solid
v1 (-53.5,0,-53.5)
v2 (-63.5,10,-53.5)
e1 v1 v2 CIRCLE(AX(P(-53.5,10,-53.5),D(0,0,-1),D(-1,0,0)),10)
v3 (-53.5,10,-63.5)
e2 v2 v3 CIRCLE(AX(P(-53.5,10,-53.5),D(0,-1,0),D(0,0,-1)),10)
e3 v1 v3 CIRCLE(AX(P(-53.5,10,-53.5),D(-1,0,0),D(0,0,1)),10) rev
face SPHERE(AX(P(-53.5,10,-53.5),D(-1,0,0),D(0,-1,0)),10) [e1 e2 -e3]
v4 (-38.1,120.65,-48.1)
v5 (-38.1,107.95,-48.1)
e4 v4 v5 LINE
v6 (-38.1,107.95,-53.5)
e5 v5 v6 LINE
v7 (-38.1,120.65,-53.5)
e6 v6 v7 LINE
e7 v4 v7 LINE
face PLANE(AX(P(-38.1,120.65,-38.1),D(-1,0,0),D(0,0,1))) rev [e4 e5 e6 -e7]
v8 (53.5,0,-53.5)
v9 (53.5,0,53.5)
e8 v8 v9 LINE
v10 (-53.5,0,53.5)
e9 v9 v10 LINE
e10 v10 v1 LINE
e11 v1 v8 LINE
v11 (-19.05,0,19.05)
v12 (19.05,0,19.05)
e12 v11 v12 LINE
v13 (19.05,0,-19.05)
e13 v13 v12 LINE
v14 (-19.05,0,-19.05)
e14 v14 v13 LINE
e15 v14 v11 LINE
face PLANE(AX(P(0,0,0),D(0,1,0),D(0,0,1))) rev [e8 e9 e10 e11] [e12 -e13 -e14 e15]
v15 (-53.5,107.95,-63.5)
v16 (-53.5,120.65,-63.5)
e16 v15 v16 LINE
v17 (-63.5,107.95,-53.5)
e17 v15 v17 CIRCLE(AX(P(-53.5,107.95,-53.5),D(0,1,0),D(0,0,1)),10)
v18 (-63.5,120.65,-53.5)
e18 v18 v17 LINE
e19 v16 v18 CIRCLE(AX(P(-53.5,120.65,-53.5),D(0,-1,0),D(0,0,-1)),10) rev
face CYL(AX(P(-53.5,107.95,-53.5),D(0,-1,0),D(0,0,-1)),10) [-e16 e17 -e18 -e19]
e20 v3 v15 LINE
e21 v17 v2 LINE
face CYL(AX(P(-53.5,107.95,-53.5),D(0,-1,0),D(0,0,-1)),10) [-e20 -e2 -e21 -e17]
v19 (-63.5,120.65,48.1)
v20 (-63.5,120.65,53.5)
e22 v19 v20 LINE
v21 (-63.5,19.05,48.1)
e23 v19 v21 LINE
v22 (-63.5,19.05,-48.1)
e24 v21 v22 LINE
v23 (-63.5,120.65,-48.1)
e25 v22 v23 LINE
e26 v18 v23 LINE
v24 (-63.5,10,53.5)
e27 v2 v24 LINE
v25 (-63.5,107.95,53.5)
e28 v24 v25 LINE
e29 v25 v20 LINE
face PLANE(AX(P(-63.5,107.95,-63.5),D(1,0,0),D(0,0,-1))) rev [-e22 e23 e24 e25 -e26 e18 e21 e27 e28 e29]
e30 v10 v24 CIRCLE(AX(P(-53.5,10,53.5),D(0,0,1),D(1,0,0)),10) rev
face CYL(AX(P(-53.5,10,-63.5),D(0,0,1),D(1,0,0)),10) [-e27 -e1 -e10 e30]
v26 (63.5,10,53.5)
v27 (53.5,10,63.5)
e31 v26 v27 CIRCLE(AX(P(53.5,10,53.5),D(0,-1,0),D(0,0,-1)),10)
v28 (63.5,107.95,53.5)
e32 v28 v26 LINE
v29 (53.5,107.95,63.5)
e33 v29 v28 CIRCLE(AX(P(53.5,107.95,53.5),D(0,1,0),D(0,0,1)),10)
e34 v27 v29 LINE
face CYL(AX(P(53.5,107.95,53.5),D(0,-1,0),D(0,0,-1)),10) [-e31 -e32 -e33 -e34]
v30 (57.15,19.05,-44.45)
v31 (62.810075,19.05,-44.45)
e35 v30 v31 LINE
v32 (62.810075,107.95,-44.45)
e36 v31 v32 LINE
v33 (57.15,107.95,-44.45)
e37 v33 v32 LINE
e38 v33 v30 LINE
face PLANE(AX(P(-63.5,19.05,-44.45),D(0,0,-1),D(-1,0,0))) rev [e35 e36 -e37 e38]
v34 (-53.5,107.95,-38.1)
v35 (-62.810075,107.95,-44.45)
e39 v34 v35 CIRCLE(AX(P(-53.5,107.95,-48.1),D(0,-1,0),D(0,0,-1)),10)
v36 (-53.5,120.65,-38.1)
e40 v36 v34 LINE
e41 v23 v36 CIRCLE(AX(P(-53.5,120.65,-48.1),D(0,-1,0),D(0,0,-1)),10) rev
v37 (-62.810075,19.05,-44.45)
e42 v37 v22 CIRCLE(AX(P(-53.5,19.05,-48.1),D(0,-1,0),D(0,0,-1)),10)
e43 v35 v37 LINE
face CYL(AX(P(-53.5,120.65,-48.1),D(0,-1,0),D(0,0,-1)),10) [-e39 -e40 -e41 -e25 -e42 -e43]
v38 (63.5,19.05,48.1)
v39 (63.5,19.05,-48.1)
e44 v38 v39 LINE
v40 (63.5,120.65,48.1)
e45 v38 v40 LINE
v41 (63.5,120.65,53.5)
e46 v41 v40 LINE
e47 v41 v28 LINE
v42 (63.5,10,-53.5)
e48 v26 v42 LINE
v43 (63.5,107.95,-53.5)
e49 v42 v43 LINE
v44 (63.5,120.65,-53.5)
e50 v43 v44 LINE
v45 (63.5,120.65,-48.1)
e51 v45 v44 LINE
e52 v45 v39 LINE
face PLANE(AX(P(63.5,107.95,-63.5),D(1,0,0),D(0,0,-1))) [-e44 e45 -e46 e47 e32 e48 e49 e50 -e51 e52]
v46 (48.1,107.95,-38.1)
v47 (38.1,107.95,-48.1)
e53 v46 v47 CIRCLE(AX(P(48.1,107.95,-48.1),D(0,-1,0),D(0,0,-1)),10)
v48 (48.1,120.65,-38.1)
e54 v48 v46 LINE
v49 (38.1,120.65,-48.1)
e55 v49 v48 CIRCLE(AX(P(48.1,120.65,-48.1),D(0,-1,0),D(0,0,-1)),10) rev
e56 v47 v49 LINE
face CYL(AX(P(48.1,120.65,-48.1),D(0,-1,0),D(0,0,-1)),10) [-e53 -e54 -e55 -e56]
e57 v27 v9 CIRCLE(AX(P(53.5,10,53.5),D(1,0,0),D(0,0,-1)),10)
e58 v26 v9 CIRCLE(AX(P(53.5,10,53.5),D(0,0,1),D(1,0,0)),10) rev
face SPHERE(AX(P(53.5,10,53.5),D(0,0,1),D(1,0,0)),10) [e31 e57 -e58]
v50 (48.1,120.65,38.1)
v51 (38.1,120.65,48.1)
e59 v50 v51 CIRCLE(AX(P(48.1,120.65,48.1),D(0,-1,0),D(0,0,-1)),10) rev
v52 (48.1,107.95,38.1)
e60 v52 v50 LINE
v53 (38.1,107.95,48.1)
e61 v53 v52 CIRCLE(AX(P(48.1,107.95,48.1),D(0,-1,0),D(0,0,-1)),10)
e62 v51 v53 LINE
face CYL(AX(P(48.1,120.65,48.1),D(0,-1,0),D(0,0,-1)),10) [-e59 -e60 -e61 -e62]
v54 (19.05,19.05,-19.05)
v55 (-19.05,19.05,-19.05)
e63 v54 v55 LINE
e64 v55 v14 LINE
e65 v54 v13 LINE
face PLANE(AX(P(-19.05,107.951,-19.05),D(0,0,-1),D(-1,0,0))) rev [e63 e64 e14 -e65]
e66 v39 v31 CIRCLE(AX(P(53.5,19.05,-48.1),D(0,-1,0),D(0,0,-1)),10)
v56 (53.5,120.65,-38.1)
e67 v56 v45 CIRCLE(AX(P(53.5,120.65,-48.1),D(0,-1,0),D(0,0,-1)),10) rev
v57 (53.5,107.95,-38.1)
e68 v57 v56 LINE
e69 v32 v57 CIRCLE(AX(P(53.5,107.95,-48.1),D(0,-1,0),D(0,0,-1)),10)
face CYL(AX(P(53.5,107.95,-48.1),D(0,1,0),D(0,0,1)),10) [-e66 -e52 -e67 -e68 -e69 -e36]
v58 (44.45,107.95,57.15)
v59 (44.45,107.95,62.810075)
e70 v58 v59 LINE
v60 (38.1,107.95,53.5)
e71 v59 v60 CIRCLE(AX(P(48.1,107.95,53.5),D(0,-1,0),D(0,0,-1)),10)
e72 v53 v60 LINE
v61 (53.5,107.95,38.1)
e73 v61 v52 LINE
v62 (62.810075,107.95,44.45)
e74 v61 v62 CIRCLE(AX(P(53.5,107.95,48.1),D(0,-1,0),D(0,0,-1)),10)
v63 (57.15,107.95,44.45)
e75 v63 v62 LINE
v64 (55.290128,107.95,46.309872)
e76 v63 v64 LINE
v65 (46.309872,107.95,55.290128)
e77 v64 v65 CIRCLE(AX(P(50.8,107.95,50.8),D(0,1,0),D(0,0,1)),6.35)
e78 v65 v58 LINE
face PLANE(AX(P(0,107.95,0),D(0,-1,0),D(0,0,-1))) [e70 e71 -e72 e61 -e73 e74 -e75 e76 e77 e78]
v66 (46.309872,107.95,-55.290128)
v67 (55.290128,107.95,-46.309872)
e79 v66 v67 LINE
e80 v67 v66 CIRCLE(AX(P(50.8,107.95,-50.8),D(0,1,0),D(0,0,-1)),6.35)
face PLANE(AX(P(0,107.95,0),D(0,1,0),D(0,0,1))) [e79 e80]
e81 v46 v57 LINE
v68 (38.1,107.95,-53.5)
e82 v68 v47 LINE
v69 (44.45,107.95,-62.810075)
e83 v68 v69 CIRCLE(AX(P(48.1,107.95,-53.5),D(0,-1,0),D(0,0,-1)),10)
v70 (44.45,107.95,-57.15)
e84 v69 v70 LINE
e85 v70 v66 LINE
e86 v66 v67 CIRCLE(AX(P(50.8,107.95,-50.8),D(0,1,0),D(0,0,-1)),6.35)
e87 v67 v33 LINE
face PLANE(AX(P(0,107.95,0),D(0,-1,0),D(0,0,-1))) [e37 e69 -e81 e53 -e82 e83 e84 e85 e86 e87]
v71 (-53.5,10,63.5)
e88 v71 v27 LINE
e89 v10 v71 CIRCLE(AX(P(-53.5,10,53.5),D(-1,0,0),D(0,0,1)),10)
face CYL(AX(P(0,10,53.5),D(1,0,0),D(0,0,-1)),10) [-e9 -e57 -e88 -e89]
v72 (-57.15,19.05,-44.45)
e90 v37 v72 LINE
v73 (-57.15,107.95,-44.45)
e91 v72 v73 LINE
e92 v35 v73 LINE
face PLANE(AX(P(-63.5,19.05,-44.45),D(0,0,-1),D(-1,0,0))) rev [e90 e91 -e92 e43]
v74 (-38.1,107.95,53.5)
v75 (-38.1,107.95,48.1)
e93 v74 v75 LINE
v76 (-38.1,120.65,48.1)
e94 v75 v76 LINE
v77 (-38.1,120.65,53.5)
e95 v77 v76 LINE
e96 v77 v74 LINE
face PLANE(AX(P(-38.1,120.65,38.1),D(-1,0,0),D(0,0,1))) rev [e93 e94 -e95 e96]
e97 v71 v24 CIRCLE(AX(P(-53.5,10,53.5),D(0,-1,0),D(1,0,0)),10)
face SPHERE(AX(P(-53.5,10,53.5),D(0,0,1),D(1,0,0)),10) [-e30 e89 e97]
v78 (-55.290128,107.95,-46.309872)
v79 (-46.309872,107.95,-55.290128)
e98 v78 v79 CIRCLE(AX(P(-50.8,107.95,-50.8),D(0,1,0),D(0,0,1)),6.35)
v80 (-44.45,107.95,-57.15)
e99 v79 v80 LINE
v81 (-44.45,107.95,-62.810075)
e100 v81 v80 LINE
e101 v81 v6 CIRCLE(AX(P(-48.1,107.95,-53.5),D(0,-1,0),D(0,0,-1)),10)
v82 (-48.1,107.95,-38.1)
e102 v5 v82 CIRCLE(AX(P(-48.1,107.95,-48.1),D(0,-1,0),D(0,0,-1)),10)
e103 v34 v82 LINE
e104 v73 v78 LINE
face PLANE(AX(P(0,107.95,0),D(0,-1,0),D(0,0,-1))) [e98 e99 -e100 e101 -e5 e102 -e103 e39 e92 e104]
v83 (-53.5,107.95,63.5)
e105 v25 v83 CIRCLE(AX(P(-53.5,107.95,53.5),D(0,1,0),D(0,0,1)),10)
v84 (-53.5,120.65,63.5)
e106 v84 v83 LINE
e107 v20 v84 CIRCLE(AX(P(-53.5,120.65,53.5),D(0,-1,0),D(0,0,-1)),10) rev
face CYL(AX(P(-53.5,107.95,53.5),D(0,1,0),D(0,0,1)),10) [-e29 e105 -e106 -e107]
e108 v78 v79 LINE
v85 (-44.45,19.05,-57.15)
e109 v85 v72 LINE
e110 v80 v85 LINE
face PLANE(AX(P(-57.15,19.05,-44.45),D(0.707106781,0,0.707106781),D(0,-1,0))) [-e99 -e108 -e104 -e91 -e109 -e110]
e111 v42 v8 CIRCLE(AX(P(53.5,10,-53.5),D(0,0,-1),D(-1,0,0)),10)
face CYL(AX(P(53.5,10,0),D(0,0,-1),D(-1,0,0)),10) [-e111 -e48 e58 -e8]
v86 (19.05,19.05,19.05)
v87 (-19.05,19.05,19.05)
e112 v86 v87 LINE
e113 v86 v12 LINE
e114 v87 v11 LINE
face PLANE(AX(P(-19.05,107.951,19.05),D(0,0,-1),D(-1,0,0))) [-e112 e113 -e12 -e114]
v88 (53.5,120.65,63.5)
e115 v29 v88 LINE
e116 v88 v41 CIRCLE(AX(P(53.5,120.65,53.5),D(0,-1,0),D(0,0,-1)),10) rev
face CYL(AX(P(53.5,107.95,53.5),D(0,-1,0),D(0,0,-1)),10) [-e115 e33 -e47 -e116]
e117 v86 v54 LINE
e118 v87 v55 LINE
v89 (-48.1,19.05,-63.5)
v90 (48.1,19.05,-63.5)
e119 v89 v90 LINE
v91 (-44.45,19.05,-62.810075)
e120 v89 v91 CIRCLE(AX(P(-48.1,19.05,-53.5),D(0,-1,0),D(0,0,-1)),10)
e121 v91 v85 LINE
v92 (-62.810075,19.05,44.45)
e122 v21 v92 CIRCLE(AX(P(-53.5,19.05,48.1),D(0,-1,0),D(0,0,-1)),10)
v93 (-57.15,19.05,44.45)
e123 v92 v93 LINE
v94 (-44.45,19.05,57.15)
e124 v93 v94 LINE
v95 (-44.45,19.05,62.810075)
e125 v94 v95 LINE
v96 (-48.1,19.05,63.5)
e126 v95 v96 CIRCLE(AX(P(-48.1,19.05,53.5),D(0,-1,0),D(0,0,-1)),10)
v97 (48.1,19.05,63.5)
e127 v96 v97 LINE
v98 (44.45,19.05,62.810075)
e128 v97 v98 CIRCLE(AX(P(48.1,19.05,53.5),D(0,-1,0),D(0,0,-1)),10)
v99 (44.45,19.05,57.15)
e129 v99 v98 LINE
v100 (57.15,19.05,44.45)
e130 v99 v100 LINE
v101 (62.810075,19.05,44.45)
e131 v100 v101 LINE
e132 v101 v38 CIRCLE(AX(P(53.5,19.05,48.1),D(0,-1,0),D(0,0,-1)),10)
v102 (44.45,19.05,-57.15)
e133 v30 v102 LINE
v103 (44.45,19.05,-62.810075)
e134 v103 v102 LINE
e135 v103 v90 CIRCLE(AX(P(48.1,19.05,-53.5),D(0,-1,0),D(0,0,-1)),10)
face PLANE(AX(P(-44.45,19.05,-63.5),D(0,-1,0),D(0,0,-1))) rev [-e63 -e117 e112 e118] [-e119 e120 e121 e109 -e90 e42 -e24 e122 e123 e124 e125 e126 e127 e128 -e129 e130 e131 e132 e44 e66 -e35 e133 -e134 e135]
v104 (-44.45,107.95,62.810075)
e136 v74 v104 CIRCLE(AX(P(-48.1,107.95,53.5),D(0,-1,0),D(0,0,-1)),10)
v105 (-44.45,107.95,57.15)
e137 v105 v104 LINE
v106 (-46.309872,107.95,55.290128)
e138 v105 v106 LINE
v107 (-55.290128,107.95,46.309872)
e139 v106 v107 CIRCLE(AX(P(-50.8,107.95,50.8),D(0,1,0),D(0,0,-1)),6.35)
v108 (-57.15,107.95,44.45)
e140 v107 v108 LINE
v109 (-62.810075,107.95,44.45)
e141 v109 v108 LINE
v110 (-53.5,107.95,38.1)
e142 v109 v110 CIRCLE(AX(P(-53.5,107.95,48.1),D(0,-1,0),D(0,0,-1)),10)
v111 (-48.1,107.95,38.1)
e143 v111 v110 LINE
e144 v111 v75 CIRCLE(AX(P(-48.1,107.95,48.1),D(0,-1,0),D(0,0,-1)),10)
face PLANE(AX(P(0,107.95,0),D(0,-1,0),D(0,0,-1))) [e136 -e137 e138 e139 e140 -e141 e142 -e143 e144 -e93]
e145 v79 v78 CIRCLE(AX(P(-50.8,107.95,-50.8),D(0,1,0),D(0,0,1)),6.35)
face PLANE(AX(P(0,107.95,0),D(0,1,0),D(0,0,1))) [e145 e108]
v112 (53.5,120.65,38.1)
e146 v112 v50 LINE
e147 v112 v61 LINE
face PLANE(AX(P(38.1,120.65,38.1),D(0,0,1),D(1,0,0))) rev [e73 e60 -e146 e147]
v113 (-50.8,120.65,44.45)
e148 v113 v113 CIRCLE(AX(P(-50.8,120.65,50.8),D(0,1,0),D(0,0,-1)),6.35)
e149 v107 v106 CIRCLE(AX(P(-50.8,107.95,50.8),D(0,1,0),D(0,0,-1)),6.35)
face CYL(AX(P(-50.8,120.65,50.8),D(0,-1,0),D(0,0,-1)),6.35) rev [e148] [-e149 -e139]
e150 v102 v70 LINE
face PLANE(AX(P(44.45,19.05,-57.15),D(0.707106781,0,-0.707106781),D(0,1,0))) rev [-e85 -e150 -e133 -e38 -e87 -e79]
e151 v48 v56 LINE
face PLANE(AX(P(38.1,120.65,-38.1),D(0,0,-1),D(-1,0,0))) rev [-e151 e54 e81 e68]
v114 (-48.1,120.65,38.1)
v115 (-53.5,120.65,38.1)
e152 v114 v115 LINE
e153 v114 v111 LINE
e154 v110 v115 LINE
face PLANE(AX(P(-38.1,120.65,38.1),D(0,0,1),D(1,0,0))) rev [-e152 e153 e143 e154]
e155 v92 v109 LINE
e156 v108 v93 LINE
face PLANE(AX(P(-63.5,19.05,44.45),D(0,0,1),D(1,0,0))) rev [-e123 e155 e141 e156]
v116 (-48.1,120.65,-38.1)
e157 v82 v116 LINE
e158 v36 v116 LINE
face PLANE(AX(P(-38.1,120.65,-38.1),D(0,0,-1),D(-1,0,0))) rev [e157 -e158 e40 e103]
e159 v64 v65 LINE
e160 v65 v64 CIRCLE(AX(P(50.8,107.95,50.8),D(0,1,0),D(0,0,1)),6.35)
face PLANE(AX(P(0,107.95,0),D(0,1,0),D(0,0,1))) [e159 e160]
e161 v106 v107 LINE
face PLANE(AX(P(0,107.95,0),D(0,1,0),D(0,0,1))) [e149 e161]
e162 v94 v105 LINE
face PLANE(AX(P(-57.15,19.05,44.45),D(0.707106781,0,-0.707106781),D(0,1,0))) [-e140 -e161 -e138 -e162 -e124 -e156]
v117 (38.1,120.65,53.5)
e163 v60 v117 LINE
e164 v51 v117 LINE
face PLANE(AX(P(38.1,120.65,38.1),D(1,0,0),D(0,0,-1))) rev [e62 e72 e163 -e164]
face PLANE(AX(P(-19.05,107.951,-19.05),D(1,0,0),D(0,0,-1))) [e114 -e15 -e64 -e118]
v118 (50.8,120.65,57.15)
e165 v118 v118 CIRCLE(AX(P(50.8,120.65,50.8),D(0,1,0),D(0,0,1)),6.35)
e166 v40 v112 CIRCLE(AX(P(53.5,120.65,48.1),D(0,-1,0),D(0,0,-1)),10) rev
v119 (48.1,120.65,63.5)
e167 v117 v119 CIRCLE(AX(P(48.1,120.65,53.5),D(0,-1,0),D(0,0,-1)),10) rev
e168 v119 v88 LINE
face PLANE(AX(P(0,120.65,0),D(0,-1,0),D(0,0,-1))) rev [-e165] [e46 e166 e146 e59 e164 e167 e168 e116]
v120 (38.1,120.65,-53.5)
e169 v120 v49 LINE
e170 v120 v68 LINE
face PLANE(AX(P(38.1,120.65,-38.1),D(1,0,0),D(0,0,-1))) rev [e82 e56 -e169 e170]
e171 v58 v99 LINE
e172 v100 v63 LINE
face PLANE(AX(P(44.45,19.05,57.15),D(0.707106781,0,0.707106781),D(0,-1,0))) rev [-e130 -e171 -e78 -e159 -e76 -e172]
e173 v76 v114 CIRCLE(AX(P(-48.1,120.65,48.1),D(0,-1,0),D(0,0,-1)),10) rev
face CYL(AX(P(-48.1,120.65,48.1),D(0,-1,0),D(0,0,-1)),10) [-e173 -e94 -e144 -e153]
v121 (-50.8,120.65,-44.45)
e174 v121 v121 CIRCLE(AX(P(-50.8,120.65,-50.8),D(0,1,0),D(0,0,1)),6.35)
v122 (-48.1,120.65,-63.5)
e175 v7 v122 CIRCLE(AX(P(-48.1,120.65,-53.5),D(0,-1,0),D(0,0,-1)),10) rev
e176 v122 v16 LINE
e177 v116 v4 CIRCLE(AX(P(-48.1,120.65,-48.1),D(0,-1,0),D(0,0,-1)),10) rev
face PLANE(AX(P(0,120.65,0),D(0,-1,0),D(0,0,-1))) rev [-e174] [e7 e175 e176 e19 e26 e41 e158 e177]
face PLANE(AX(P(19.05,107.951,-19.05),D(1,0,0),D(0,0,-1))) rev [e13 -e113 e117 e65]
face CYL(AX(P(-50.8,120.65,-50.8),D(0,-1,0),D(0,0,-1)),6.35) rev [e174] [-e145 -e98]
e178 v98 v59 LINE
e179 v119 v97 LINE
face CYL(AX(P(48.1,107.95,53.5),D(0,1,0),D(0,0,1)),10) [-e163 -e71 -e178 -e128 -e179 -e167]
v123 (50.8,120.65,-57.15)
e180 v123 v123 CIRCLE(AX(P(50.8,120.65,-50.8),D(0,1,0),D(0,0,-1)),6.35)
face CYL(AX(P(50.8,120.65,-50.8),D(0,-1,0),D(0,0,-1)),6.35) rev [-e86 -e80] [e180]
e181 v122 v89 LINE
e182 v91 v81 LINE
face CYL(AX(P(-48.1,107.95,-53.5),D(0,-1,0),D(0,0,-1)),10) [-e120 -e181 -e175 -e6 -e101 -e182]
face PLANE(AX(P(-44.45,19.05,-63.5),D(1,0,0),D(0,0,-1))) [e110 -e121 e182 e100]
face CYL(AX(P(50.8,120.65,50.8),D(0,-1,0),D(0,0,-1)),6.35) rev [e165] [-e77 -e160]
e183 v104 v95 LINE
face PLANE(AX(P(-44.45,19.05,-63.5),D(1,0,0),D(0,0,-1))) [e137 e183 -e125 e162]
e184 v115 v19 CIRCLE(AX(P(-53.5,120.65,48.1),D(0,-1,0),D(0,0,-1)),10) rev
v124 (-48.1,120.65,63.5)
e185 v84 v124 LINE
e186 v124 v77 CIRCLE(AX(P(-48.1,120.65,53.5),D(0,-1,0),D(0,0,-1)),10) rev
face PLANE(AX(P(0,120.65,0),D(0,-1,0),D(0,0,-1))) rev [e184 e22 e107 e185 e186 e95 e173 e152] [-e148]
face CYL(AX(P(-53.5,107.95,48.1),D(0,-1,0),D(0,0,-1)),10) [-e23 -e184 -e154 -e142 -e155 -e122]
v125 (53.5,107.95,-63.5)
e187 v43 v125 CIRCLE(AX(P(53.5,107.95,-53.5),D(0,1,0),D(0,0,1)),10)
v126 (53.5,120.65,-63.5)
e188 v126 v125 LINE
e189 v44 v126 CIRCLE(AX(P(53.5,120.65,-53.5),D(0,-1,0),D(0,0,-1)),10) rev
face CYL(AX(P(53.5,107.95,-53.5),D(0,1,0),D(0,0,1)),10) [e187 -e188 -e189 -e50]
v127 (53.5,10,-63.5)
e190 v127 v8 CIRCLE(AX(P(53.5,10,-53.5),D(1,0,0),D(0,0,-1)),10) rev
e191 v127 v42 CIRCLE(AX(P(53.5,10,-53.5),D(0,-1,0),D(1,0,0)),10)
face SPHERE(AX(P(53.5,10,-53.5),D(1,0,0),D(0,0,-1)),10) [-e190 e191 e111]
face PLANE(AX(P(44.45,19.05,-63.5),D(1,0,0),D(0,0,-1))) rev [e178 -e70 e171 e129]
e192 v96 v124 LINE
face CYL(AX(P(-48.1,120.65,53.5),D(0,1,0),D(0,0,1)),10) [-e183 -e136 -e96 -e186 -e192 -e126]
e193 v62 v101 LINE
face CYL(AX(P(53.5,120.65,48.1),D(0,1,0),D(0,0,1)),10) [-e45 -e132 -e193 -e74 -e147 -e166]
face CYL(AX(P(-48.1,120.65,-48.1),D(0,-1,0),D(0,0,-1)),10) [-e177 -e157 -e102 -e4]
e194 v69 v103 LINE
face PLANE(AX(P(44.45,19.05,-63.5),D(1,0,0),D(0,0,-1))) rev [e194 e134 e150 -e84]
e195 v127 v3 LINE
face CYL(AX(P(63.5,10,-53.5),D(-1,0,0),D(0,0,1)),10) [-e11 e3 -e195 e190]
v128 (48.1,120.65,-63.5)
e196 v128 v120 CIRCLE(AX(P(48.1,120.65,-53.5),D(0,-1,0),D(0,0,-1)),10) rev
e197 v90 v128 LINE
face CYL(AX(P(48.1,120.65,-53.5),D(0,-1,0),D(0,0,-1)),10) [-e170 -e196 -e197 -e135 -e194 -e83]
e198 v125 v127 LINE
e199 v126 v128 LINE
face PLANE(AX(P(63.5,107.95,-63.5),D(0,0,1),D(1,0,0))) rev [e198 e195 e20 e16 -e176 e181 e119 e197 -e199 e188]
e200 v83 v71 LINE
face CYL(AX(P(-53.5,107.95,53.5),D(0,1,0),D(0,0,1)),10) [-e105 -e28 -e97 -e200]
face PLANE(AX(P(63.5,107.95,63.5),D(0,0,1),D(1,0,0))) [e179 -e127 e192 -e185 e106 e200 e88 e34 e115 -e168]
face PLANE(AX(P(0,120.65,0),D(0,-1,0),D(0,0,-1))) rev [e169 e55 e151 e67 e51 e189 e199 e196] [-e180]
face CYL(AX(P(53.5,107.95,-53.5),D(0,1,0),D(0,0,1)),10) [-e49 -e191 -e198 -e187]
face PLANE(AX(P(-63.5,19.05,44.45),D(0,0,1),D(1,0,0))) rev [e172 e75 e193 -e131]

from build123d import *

# Parameters (mm, degrees)
SKETCH1_W           = 127
SKETCH1_H           = 127
BOSS_EXTRUDE1_DEPTH = 107.95
SKETCH2_W           = 88.9
SKETCH2_H           = 88.9
CUT_EXTRUDE1_DEPTH  = 179.366063196
SKETCH4_W           = 88.9
SKETCH4_H           = 88.9
CUT_EXTRUDE4_DEPTH  = 179.366063196
CUT_EXTRUDE5_REACH  = 142.42
SKETCH6_W           = 38.1
SKETCH6_H           = 38.1
FILLET1_R           = 10
CHAMFER2_SIZE       = 12.7
SKETCH7_W           = 25.4
SKETCH7_H           = 25.4
SKETCH7_R           = 6.35
BOSS_EXTRUDE2_DEPTH = 12.7
FILLET2_START       = 19.05
FILLET2_DEPTH       = 101.6


with BuildPart() as part:
    # Sketch1 → Boss-Extrude1 (new body)
    with BuildSketch(Plane(origin=(0, 0, 0), x_dir=(1, 0, 0), z_dir=(0, 1, 0))):
        Rectangle(SKETCH1_W, SKETCH1_H)
    extrude(amount=BOSS_EXTRUDE1_DEPTH)

    # Sketch2 → Cut-Extrude1 (cut, through all)
    with BuildSketch(Plane.XY.offset(63.5)):
        with Locations((0, 63.5)):
            Rectangle(SKETCH2_W, SKETCH2_H)
    extrude(amount=-CUT_EXTRUDE1_DEPTH, mode=Mode.SUBTRACT)

    # Sketch4 → Cut-Extrude4 (cut, through all)
    with BuildSketch(Plane(origin=(63.5, 0, 0), x_dir=(0, 0, -1), z_dir=(1, 0, 0))):
        with Locations((0, 63.5)):
            Rectangle(SKETCH4_W, SKETCH4_H)
    extrude(amount=-CUT_EXTRUDE4_DEPTH, mode=Mode.SUBTRACT)

    # Sketch6 → Cut-Extrude5 (cut, up to next)
    with BuildSketch(Plane.XZ, mode=Mode.PRIVATE) as cut_extrude5_sk1:
        Rectangle(SKETCH6_W, SKETCH6_H)
    cut_extrude5_tool1 = extrude(cut_extrude5_sk1.sketch, amount=-CUT_EXTRUDE5_REACH, mode=Mode.PRIVATE) & part.part
    add(cut_extrude5_tool1.solids().sort_by_distance((0, 0, 0))[0], mode=Mode.SUBTRACT)

    # Fillet1
    fillet1_edges = [part.edges().sort_by_distance(p)[0] for p in [
        (63.5, 0, 0),
        (0, 0, -63.5),
        (-63.5, 0, 0),
        (0, 0, 63.5),
        (63.5, 53.975, 63.5),
        (63.5, 53.975, -63.5),
        (-63.5, 53.975, -63.5),
        (-63.5, 53.975, 63.5),
    ]]
    fillet(fillet1_edges, radius=FILLET1_R)

    # Chamfer2
    chamfer2_edges = [part.edges().sort_by_distance(p)[0] for p in [
        (-44.45, 63.5, -44.45),
        (44.45, 63.5, -44.45),
        (-44.45, 63.5, 44.45),
        (44.45, 63.5, 44.45),
    ]]
    chamfer(chamfer2_edges, length=CHAMFER2_SIZE)

    # Sketch7 → Boss-Extrude2 (add)
    # profile 1 of 4: a face of its own
    with BuildSketch(Plane(origin=(0, 107.95, 0), x_dir=(1, 0, 0), z_dir=(0, 1, 0))):
        with Locations((50.8, 50.8)):
            Rectangle(SKETCH7_W, SKETCH7_H)
        with Locations(Location((50.8, 50.8, 0), (0, 0, 90))):
            Circle(SKETCH7_R, mode=Mode.SUBTRACT)
    # profile 2 of 4: a face of its own
    with BuildSketch(Plane(origin=(0, 107.95, 0), x_dir=(1, 0, 0), z_dir=(0, 1, 0))):
        with Locations((-50.8, 50.8)):
            Rectangle(SKETCH7_W, SKETCH7_H)
        with Locations(Location((-50.8, 50.8, 0), (0, 0, 45))):
            Circle(SKETCH7_R, mode=Mode.SUBTRACT)
    # profile 3 of 4: a face of its own
    with BuildSketch(Plane(origin=(0, 107.95, 0), x_dir=(1, 0, 0), z_dir=(0, 1, 0))):
        with Locations((-50.8, -50.8)):
            Rectangle(SKETCH7_W, SKETCH7_H)
        with Locations(Location((-50.8, -50.8, 0), (0, 0, 90))):
            Circle(SKETCH7_R, mode=Mode.SUBTRACT)
    # profile 4 of 4: a face of its own
    with BuildSketch(Plane(origin=(0, 107.95, 0), x_dir=(1, 0, 0), z_dir=(0, 1, 0))):
        with Locations((50.8, -50.8)):
            Rectangle(SKETCH7_W, SKETCH7_H)
        with Locations(Location((50.8, -50.8, 0), (0, 0, 45))):
            Circle(SKETCH7_R, mode=Mode.SUBTRACT)
    extrude(amount=BOSS_EXTRUDE2_DEPTH)

    # Fillet2: read off the stored shape, not the designer's step
    # Fillet2 outline → Fillet2 (cut)
    with BuildSketch(Plane(origin=(0, 0, 0), x_dir=(1, 0, 0), z_dir=(0, 1, 0)).offset(FILLET2_START)):
        with BuildLine():
            Line((63.5, -63.5), (63.5, -53.5))
            ThreePointArc((63.5, -53.5), (60.571067812, -60.571067812), (53.5, -63.5))
            Line((53.5, -63.5), (63.5, -63.5))
        make_face()
        with BuildLine():
            Line((63.5, -48.1), (63.5, -38.1))
            Line((63.5, -38.1), (53.5, -38.1))
            ThreePointArc((53.5, -38.1), (60.571067812, -41.028932188), (63.5, -48.1))
        make_face()
        with BuildLine():
            ThreePointArc((48.1, -63.5), (41.028932188, -60.571067812), (38.1, -53.5))
            Line((38.1, -53.5), (38.1, -63.5))
            Line((38.1, -63.5), (48.1, -63.5))
        make_face()
        with BuildLine():
            ThreePointArc((38.1, -48.1), (41.028932188, -41.028932188), (48.1, -38.1))
            Line((48.1, -38.1), (38.1, -38.1))
            Line((38.1, -38.1), (38.1, -48.1))
        make_face()
        with BuildLine():
            Line((53.5, 38.1), (63.5, 38.1))
            Line((63.5, 38.1), (63.5, 48.1))
            ThreePointArc((63.5, 48.1), (60.571067812, 41.028932188), (53.5, 38.1))
        make_face()
        with BuildLine():
            Line((-38.1, -63.5), (-38.1, -53.5))
            ThreePointArc((-38.1, -53.5), (-41.028932188, -60.571067812), (-48.1, -63.5))
            Line((-48.1, -63.5), (-38.1, -63.5))
        make_face()
        with BuildLine():
            Line((38.1, 38.1), (48.1, 38.1))
            ThreePointArc((48.1, 38.1), (41.028932188, 41.028932188), (38.1, 48.1))
            Line((38.1, 48.1), (38.1, 38.1))
        make_face()
        with BuildLine():
            ThreePointArc((-48.1, -38.1), (-41.028932188, -41.028932188), (-38.1, -48.1))
            Line((-38.1, -48.1), (-38.1, -38.1))
            Line((-38.1, -38.1), (-48.1, -38.1))
        make_face()
        with BuildLine():
            ThreePointArc((53.5, 63.5), (60.571067812, 60.571067812), (63.5, 53.5))
            Line((63.5, 53.5), (63.5, 63.5))
            Line((63.5, 63.5), (53.5, 63.5))
        make_face()
        with BuildLine():
            Line((-63.5, -63.5), (-53.5, -63.5))
            ThreePointArc((-53.5, -63.5), (-60.571067812, -60.571067812), (-63.5, -53.5))
            Line((-63.5, -53.5), (-63.5, -63.5))
        make_face()
        with BuildLine():
            Line((38.1, 63.5), (38.1, 53.5))
            ThreePointArc((38.1, 53.5), (41.028932188, 60.571067812), (48.1, 63.5))
            Line((48.1, 63.5), (38.1, 63.5))
        make_face()
        with BuildLine():
            Line((-53.5, -38.1), (-63.5, -38.1))
            Line((-63.5, -38.1), (-63.5, -48.1))
            ThreePointArc((-63.5, -48.1), (-60.571067812, -41.028932188), (-53.5, -38.1))
        make_face()
        with BuildLine():
            Line((-38.1, 53.5), (-38.1, 63.5))
            Line((-38.1, 63.5), (-48.1, 63.5))
            ThreePointArc((-48.1, 63.5), (-41.028932188, 60.571067812), (-38.1, 53.5))
        make_face()
        with BuildLine():
            Line((-63.5, 38.1), (-53.5, 38.1))
            ThreePointArc((-53.5, 38.1), (-60.571067812, 41.028932188), (-63.5, 48.1))
            Line((-63.5, 48.1), (-63.5, 38.1))
        make_face()
        with BuildLine():
            Line((-38.1, 38.1), (-38.1, 48.1))
            ThreePointArc((-38.1, 48.1), (-41.028932188, 41.028932188), (-48.1, 38.1))
            Line((-48.1, 38.1), (-38.1, 38.1))
        make_face()
        with BuildLine():
            ThreePointArc((-63.5, 53.5), (-60.571067812, 60.571067812), (-53.5, 63.5))
            Line((-53.5, 63.5), (-63.5, 63.5))
            Line((-63.5, 63.5), (-63.5, 53.5))
        make_face()
    extrude(amount=FILLET2_DEPTH, mode=Mode.SUBTRACT)


solid = part.part
